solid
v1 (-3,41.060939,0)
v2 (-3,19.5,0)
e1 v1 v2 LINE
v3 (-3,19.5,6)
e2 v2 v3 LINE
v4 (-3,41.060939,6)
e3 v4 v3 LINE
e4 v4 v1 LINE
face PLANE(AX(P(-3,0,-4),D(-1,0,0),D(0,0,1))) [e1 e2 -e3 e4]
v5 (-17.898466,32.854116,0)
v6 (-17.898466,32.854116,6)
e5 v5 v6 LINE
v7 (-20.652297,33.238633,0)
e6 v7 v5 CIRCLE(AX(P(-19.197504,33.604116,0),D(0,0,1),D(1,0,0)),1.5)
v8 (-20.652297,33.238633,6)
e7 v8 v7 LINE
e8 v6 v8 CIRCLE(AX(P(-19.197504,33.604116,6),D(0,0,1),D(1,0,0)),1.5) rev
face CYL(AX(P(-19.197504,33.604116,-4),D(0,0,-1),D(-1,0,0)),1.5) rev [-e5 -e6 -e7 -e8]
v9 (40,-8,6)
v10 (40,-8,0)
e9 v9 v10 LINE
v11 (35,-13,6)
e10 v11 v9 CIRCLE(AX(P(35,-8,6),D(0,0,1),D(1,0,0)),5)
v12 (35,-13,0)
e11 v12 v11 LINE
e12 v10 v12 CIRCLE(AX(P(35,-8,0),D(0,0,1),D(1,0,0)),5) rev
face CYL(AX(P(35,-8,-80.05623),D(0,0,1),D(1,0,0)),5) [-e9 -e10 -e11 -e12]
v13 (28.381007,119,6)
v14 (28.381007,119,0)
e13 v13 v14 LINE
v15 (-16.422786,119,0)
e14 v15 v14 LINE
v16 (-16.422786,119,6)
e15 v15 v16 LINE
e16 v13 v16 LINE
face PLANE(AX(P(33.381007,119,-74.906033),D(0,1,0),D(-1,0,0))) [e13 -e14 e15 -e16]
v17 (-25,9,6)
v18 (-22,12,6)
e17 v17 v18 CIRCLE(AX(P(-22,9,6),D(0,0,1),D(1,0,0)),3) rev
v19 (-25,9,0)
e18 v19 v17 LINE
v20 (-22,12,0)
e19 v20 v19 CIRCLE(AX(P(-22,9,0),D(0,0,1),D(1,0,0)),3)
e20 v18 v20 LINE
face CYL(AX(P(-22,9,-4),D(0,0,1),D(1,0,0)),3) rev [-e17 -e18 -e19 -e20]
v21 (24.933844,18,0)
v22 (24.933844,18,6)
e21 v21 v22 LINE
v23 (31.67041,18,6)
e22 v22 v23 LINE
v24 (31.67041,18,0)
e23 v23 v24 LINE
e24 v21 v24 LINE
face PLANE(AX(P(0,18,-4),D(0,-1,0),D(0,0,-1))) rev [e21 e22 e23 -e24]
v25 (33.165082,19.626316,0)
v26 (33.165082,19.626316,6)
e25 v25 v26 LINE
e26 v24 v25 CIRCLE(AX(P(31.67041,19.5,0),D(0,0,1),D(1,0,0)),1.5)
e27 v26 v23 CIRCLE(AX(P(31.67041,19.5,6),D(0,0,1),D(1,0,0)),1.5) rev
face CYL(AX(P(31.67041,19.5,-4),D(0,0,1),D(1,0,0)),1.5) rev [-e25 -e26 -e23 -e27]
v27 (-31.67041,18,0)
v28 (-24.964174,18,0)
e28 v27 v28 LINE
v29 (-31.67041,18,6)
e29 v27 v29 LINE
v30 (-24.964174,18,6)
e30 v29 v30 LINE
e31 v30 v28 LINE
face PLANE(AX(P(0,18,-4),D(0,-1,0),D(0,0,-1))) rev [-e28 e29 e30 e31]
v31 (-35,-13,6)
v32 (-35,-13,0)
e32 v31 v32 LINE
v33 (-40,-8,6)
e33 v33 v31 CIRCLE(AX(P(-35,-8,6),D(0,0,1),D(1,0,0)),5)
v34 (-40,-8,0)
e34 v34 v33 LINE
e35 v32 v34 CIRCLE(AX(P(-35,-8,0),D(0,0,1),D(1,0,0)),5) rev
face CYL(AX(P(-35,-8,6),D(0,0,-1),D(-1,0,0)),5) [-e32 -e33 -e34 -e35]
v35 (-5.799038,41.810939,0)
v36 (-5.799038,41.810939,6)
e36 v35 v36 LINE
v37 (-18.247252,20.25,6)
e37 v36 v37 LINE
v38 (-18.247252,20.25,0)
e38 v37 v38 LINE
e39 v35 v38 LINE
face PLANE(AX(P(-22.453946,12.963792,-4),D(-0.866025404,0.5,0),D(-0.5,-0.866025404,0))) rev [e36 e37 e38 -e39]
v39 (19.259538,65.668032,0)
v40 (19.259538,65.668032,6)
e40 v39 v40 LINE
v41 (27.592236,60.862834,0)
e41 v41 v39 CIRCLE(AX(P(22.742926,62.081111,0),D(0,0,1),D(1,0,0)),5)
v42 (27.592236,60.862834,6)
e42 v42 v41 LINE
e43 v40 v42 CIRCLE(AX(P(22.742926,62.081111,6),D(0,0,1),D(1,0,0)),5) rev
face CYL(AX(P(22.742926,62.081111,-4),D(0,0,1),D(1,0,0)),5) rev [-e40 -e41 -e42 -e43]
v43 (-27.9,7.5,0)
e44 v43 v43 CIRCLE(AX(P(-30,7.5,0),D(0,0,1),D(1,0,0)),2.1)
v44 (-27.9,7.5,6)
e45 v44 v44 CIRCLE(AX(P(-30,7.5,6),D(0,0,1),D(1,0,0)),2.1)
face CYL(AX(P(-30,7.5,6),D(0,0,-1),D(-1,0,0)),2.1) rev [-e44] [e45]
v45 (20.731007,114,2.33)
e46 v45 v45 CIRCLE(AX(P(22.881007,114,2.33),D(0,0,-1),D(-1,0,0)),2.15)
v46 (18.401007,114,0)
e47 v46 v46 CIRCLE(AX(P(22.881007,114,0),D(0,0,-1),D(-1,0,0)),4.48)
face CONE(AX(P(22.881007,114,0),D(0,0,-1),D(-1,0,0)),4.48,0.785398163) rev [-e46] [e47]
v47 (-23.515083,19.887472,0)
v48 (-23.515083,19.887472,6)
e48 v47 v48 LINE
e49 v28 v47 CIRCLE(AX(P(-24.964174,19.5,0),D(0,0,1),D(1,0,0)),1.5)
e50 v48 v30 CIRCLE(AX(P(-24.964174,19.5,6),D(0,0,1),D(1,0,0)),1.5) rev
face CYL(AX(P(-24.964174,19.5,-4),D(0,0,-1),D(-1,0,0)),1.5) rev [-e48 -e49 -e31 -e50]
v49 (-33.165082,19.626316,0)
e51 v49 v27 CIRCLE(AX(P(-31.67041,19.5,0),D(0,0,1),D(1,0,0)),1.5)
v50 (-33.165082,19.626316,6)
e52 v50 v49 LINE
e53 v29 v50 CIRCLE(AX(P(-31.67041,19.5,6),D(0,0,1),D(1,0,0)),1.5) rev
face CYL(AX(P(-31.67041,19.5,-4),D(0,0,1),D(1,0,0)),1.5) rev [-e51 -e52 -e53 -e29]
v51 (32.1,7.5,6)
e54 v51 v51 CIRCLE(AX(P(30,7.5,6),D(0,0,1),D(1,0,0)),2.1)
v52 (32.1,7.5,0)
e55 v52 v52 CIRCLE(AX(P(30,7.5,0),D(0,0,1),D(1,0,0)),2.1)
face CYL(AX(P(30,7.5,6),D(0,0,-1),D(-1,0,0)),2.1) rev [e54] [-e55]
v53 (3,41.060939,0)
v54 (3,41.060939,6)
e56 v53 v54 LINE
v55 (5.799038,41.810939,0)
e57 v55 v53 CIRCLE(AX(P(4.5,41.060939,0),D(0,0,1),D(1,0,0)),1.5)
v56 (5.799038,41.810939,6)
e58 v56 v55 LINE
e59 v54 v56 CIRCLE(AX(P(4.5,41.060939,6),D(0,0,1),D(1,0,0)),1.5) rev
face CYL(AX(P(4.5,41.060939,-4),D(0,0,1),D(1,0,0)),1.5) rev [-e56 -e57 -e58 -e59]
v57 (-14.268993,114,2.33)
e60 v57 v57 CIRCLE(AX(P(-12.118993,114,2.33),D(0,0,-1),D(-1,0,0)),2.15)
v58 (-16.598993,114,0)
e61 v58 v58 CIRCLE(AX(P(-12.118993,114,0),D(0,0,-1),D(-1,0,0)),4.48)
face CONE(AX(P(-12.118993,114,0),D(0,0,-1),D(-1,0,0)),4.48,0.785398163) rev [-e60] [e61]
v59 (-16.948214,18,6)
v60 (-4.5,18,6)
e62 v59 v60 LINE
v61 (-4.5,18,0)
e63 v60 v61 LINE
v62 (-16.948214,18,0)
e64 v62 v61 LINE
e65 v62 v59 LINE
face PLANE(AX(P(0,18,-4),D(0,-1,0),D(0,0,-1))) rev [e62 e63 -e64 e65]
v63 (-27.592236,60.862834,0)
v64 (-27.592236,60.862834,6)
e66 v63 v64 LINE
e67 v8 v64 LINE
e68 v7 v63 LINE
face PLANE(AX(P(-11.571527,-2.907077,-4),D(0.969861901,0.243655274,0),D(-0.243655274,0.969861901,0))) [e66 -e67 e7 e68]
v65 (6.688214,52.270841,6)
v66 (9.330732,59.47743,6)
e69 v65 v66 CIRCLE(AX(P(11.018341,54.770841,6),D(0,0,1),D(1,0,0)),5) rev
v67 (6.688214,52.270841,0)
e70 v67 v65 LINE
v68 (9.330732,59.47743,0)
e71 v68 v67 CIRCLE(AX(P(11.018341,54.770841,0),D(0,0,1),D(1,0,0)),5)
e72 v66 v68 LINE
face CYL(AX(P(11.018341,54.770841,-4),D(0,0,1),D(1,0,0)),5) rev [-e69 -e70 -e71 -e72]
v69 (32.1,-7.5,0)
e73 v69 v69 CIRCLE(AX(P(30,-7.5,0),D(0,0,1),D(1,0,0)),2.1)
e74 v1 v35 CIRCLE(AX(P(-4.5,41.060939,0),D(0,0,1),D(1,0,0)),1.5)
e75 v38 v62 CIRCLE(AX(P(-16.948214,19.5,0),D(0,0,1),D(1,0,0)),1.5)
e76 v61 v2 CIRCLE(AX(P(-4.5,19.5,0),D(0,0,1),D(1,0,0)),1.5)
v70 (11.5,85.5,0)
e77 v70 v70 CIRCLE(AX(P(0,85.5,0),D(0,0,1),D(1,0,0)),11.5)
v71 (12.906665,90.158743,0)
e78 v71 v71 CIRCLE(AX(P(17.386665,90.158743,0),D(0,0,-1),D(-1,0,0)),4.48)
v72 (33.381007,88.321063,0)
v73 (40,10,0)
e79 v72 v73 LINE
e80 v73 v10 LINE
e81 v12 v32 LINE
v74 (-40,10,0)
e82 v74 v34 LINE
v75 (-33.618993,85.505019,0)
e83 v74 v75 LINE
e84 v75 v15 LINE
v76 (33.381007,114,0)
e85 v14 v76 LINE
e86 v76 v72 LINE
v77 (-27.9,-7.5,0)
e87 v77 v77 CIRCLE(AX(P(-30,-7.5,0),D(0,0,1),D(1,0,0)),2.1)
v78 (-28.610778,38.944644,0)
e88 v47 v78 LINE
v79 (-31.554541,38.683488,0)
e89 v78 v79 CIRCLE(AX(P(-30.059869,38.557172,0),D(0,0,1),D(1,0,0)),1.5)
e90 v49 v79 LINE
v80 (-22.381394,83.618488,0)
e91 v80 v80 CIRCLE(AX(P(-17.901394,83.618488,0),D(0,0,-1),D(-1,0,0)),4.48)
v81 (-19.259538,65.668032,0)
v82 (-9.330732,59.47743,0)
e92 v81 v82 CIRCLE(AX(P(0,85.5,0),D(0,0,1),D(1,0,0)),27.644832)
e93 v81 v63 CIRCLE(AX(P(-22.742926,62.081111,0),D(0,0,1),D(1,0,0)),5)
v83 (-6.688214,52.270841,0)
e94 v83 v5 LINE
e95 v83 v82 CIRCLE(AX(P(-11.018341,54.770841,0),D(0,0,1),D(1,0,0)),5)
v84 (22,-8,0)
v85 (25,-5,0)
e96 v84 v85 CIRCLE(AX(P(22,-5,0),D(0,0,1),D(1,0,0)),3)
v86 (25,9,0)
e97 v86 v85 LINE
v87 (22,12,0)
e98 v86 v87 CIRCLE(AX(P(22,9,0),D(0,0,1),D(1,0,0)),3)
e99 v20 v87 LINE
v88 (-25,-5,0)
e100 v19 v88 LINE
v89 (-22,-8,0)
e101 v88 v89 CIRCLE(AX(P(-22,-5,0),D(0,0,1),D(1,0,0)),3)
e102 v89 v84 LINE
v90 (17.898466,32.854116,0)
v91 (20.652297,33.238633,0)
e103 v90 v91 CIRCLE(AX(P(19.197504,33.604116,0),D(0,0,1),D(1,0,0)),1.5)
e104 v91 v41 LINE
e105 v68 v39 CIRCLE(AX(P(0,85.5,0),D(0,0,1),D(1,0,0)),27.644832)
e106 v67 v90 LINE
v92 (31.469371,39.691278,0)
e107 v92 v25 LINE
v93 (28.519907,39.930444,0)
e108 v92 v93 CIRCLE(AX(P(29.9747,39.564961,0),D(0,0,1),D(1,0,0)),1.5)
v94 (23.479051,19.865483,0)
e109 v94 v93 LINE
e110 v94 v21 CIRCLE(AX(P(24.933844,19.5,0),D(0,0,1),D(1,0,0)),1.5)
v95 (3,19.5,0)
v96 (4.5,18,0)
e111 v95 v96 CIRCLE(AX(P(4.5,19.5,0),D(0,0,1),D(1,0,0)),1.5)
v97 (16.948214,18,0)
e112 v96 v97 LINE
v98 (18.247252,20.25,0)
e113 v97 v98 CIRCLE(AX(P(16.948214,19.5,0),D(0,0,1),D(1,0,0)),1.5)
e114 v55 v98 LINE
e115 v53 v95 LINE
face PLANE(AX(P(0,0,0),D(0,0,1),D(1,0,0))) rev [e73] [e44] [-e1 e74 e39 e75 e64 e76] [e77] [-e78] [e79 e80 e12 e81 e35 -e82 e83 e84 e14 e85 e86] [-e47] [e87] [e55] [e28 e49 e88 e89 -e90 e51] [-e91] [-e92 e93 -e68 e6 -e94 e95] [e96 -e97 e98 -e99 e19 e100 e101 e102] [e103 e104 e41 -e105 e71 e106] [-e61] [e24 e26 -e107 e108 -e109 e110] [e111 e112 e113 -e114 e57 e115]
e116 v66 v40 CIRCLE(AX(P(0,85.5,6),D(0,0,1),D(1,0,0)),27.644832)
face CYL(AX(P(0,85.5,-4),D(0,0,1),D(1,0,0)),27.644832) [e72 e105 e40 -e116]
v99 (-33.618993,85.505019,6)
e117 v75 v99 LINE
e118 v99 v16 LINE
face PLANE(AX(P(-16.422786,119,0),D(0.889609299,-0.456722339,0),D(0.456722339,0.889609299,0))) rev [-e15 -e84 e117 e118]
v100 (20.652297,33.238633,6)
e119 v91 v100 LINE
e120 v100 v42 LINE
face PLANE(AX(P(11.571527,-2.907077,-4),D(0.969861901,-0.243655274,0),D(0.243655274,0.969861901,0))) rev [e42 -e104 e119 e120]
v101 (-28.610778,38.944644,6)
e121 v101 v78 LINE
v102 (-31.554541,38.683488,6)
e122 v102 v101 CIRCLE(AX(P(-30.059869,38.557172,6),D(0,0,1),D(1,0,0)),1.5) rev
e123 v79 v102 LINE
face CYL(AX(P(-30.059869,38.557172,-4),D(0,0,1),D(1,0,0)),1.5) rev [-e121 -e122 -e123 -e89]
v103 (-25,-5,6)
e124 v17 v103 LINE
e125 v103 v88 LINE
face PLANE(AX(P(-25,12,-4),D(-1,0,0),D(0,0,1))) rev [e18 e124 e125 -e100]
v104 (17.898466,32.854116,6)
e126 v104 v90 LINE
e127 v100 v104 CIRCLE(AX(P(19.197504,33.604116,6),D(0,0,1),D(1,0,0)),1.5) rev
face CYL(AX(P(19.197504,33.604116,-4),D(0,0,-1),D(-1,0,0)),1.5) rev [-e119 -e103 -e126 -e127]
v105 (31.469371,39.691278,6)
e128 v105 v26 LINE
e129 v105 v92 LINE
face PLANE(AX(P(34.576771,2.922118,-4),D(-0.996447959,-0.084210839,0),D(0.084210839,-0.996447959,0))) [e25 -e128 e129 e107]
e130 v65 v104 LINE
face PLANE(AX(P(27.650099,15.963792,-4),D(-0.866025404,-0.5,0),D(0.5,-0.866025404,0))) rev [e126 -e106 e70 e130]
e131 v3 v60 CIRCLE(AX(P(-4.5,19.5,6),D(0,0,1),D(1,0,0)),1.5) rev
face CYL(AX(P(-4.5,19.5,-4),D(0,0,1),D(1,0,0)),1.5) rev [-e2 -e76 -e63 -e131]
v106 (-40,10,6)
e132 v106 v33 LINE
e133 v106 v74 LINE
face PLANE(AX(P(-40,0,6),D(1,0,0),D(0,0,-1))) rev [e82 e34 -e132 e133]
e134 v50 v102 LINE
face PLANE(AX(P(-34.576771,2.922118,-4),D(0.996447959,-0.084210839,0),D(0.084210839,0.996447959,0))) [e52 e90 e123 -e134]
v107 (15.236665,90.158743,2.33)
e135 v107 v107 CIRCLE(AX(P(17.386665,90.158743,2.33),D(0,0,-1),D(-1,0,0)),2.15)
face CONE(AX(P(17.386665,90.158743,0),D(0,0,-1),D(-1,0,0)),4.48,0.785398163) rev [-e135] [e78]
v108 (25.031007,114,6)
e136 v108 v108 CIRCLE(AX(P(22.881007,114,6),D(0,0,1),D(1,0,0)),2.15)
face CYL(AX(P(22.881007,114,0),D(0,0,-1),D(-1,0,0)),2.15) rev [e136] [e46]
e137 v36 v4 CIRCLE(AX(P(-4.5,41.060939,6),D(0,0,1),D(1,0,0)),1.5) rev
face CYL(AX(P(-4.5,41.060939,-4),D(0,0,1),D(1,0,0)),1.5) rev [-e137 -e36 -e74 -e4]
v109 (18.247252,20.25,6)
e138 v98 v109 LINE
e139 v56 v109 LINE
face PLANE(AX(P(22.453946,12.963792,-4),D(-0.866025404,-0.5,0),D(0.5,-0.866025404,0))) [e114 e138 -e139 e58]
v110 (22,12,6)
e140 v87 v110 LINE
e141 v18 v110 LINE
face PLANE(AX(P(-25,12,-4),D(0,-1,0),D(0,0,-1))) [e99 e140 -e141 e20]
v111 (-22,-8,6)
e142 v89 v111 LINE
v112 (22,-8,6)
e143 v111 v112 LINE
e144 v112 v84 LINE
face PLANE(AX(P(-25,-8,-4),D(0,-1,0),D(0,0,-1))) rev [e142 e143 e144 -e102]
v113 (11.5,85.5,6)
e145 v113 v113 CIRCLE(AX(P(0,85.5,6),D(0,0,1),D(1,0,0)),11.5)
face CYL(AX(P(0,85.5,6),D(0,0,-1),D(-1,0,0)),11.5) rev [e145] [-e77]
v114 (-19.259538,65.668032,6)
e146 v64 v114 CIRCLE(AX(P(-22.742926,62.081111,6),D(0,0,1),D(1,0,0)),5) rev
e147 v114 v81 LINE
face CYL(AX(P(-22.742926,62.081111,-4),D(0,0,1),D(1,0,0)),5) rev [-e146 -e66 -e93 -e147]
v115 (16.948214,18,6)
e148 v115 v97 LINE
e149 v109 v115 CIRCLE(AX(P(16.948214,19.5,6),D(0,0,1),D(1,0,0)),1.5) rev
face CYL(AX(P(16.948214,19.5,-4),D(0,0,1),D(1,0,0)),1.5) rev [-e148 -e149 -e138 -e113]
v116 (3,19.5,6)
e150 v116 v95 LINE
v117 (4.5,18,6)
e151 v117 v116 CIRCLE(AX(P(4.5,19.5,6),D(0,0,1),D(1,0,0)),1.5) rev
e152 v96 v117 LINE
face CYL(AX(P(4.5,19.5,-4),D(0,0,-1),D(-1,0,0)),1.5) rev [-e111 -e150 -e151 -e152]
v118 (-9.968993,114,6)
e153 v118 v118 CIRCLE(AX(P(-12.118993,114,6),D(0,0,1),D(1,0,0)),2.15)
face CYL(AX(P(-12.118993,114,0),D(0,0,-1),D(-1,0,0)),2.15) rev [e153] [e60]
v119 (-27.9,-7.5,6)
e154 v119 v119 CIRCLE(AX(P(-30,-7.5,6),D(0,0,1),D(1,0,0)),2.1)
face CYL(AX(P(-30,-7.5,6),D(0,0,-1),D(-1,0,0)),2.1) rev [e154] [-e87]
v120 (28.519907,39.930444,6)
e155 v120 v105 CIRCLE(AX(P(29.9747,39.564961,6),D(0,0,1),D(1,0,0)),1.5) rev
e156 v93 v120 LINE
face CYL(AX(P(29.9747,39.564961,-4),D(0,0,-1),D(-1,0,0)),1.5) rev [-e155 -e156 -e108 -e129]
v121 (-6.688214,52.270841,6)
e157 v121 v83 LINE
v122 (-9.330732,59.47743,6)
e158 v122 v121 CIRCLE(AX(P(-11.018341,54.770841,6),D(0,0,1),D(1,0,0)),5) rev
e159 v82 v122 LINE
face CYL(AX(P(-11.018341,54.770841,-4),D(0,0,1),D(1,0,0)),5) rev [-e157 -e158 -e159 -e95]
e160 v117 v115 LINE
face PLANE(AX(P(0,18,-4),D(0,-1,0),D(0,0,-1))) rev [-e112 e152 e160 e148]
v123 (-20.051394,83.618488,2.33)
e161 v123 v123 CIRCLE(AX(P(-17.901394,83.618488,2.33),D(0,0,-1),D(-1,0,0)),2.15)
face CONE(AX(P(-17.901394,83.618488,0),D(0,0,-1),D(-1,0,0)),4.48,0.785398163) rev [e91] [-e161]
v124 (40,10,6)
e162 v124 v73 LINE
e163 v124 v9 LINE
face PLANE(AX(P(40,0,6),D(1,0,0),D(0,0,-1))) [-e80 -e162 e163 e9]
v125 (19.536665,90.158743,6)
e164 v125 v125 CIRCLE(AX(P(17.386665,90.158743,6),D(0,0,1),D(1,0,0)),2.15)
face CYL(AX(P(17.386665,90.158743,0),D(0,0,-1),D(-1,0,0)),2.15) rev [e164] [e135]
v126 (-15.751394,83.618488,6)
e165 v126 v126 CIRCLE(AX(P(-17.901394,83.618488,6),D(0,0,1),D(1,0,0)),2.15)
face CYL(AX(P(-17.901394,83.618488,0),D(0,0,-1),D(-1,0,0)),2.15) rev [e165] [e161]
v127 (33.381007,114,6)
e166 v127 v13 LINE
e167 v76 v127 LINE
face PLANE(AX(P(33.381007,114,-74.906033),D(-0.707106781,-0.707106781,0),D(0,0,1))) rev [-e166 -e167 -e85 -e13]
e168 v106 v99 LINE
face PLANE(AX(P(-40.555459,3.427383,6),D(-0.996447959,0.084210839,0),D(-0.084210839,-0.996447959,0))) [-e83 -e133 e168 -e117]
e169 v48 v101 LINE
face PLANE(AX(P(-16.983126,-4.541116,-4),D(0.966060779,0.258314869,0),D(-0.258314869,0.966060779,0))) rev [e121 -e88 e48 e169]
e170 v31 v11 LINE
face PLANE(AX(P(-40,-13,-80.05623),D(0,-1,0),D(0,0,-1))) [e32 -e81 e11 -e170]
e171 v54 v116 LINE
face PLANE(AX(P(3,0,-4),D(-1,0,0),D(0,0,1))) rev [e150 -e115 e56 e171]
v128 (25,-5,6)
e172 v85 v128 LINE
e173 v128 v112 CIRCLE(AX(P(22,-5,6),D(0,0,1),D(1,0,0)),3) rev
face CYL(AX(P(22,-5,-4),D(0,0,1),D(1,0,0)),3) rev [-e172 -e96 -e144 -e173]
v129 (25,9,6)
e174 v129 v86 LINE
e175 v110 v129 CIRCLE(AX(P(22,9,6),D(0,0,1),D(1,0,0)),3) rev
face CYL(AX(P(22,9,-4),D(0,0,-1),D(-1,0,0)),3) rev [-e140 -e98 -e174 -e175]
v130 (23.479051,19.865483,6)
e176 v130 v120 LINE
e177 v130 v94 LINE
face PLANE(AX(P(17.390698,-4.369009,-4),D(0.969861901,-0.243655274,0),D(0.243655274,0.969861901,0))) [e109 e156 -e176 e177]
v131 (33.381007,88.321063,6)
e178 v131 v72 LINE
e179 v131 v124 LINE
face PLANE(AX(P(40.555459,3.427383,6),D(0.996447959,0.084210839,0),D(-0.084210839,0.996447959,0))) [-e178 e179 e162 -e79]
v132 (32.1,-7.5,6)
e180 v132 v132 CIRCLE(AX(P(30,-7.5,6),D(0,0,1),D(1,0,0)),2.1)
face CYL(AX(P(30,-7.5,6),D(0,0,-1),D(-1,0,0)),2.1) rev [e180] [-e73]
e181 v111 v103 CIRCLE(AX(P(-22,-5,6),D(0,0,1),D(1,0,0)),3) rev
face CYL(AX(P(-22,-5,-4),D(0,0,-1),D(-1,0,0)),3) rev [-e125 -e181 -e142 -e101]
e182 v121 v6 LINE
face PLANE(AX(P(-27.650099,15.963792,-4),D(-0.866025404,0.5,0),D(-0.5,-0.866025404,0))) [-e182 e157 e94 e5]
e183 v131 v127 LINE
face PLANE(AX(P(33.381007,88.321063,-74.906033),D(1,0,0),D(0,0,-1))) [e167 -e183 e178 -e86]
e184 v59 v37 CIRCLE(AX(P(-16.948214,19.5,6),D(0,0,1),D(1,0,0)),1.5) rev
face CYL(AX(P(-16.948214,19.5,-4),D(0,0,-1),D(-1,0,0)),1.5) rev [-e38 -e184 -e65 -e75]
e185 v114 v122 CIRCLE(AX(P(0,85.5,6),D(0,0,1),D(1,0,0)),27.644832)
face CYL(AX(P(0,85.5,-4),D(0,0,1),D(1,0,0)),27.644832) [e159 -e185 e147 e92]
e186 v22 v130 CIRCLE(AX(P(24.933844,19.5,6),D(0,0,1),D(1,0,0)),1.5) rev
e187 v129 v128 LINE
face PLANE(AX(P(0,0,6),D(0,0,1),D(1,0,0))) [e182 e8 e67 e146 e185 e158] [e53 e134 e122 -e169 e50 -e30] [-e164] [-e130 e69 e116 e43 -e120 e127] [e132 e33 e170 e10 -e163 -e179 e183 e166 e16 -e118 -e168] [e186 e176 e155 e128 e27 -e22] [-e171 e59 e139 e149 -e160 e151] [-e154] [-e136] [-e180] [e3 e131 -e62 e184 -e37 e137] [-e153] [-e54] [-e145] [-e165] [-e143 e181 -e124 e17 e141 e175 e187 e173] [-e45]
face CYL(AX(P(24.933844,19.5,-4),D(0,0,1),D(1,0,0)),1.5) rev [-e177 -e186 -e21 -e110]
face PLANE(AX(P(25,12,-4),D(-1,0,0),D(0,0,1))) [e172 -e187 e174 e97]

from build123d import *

# Parameters (mm, degrees)
SKETCH_1_R                   = 33.5
SKETCH_1_R_2                 = 11.5
SKETCH_1_W                   = 80
SKETCH_1_H                   = 20
SKETCH_1_R_3                 = 2.1
EXTRUDE_1_DEPTH              = 6
SKETCH_3_W                   = 80
SKETCH_3_H                   = 3
EXTRUDE_2_DEPTH              = 6
FILLET_1_R                   = 5
EXTRUDE_START                = -6
EXTRUDE_3_DEPTH              = 6
SKETCH_5_R                   = 2
CUT_EXTRUDE_1_DEPTH          = 126.686116974
HOLE_WIZARD_M4_1_D           = 4.3
HOLE_WIZARD_M4_1_DEPTH       = 10
HOLE_WIZARD_M4_1_CSINK_D     = 8.96
HOLE_WIZARD_M4_1_CSINK_ANGLE = 90
HOLE_WIZARD_M4_1_TIP         = 1.291850331
SKETCH_8_R                   = 2.1
CUT_EXTRUDE_2_DEPTH          = 10
HOLE_WIZARD_M4_2_D           = 4.3
HOLE_WIZARD_M4_2_DEPTH       = 10
HOLE_WIZARD_M4_2_CSINK_D     = 8.96
HOLE_WIZARD_M4_2_CSINK_ANGLE = 90
HOLE_WIZARD_M4_2_TIP         = 1.291850331
CHAMFER_1_SIZE               = 5
CUT_EXTRUDE_3_DEPTH          = 126.686116974
SKETCH_13_W                  = 50
SKETCH_13_H                  = 20
CUT_EXTRUDE_5_DEPTH          = 10
FILLET_3_R                   = 3
FILLET_4_R                   = 6
FILLET_5_R                   = 5
FILLET_6_R                   = 1.5
FILLET_7_R                   = 5


with BuildPart() as part:
    # 草图1 → 凸台-拉伸1 (new body)
    # profile 1 of 3: a face of its own
    with BuildSketch(Plane.XY):
        with Locations((0, 85.5)):
            Circle(SKETCH_1_R)
        with Locations((0, 85.5)):
            Circle(SKETCH_1_R_2, mode=Mode.SUBTRACT)
    # profile 2 of 3: a face of its own
    with BuildSketch(Plane.XY):
        with BuildLine():
            Line((-33.38100662, 88.32106311), (-40, 10))
            Line((-40, 10), (40, 10))
            Line((40, 10), (33.38100662, 88.32106311))
            ThreePointArc((33.38100662, 88.32106311), (33.470238435, 86.911785792), (33.5, 85.5))
            ThreePointArc((33.5, 85.5), (-1.411785792, 52.029761565), (-33.38100662, 88.32106311))
        make_face()
    # profile 3 of 3: a face of its own
    with BuildSketch(Plane.XY):
        Rectangle(SKETCH_1_W, SKETCH_1_H)
        with Locations((-30, 7.5)):
            Circle(SKETCH_1_R_3, mode=Mode.SUBTRACT)
        with Locations((30, 7.5)):
            Circle(SKETCH_1_R_3, mode=Mode.SUBTRACT)
        with Locations((30, -7.5)):
            Circle(SKETCH_1_R_3, mode=Mode.SUBTRACT)
        with Locations((-30, -7.5)):
            Circle(SKETCH_1_R_3, mode=Mode.SUBTRACT)
    extrude(amount=EXTRUDE_1_DEPTH)

    # 草图3 → 凸台-拉伸2 (add)
    with BuildSketch(Plane.XY.offset(6)):
        with Locations((0, -11.5)):
            Rectangle(SKETCH_3_W, SKETCH_3_H)
    extrude(amount=-EXTRUDE_2_DEPTH)

    # 圆角1
    fillet_1_edges = [part.edges().sort_by_distance(p)[0] for p in [
        (-40, -13, 3),
        (40, -13, 3),
    ]]
    fillet(fillet_1_edges, radius=FILLET_1_R)

    # 草图4 → 凸台-拉伸3 (add)
    with BuildSketch(Plane.XY.offset(6).offset(EXTRUDE_START)):
        with BuildLine():
            Line((33.38100662, 88.32106311), (11.148614395, 88.32106311))
            ThreePointArc((11.148614395, 88.32106311), (-1.418941021, 96.91212541), (-11.499998905, 85.50501918))
            Line((-11.499998905, 85.50501918), (-33.61899338, 85.50501918))
            Line((-33.61899338, 85.50501918), (-33.61899338, 119))
            Line((-33.61899338, 119), (33.38100662, 119))
            Line((33.38100662, 119), (33.38100662, 88.32106311))
        make_face()
    extrude(amount=EXTRUDE_3_DEPTH)

    # 草图5 → 切除-拉伸1 (cut, through all)
    with BuildSketch(Plane.XY.offset(6)):
        with Locations((-17.901394117, 83.618487661)):
            Circle(SKETCH_5_R)
        with Locations((17.386664873, 90.158742812)):
            Circle(SKETCH_5_R)
    extrude(amount=-CUT_EXTRUDE_1_DEPTH, mode=Mode.SUBTRACT)

    # M4 六角凹锥坑螺钉的锥形沉头孔1
    with Locations(Plane(origin=(0, 0, 0), x_dir=(-1, 0, 0), z_dir=(0, 0, -1))):
        with Locations((-17.386664873, 90.158742812), (17.901394117, 83.618487661)):
            CounterSinkHole(HOLE_WIZARD_M4_1_D / 2, HOLE_WIZARD_M4_1_CSINK_D / 2, depth=HOLE_WIZARD_M4_1_DEPTH, counter_sink_angle=HOLE_WIZARD_M4_1_CSINK_ANGLE)
            with Locations((0, 0, -(HOLE_WIZARD_M4_1_DEPTH + HOLE_WIZARD_M4_1_TIP / 2))):  # 118° drill point
                Cone(0, HOLE_WIZARD_M4_1_D / 2, HOLE_WIZARD_M4_1_TIP, mode=Mode.SUBTRACT)

    # 草图8 → 切除-拉伸2 (cut)
    with BuildSketch(Plane.XY.offset(6)):
        with Locations((-12.118993381, 114)):
            Circle(SKETCH_8_R)
        with Locations((22.881006619, 114)):
            Circle(SKETCH_8_R)
    extrude(amount=-CUT_EXTRUDE_2_DEPTH, mode=Mode.SUBTRACT)

    # M4 六角凹锥坑螺钉的锥形沉头孔2
    with Locations(Plane(origin=(0, 0, 0), x_dir=(-1, 0, 0), z_dir=(0, 0, -1))):
        with Locations((-22.881006619, 114), (12.118993381, 114)):
            CounterSinkHole(HOLE_WIZARD_M4_2_D / 2, HOLE_WIZARD_M4_2_CSINK_D / 2, depth=HOLE_WIZARD_M4_2_DEPTH, counter_sink_angle=HOLE_WIZARD_M4_2_CSINK_ANGLE)
            with Locations((0, 0, -(HOLE_WIZARD_M4_2_DEPTH + HOLE_WIZARD_M4_2_TIP / 2))):  # 118° drill point
                Cone(0, HOLE_WIZARD_M4_2_D / 2, HOLE_WIZARD_M4_2_TIP, mode=Mode.SUBTRACT)

    # 倒角1
    chamfer_1_edges = [part.edges().sort_by_distance(p)[0] for p in [
        (33.38100662, 119, 3),
    ]]
    chamfer(chamfer_1_edges, length=CHAMFER_1_SIZE)

    # 草图11 → 切除-拉伸3 (cut, through all)
    with BuildSketch(Plane.XY.offset(6)):
        Polygon((-33.61899338, 119), (-16.422785999, 119), (-33.61899338, 85.50501918), align=None)
    extrude(amount=-CUT_EXTRUDE_3_DEPTH, mode=Mode.SUBTRACT)

    # 草图13 → 切除-拉伸5 (cut)
    with BuildSketch(Plane.XY.offset(6)):
        with BuildLine():
            Line((-29.15457937, 67.081692819), (-19.750016495, 29.647135893))
            Line((-19.750016495, 29.647135893), (-3.346711376, 58.058493772))
            ThreePointArc((-3.346711376, 58.058493772), (-20.530627933, 66.987030012), (-27.640305628, 84.999754146))
            Line((-27.640305628, 84.999754146), (-29.15457937, 67.081692819))
        make_face()
        Polygon((-24.106901542, 22.100789629), (-30.830808938, 47.247244556), (-33.302523575, 18), (-23.010391923, 18), align=None)
        Polygon((-3, 46.65901549), (-17.649366774, 21.285567939), (-19.546290308, 18), (-3, 18), align=None)
        with BuildLine():
            Line((29.15457937, 67.081692819), (27.640305628, 84.999754146))
            ThreePointArc((27.640305628, 84.999754146), (20.530627933, 66.987030012), (3.346711376, 58.058493772))
            Line((3.346711376, 58.058493772), (19.750016495, 29.647135893))
            Line((19.750016495, 29.647135893), (29.15457937, 67.081692819))
        make_face()
        Polygon((17.649366774, 21.285567939), (3, 46.65901549), (3, 18), (19.546290308, 18), align=None)
        Polygon((33.302523575, 18), (30.711815557, 48.65526652), (24.060716784, 22.180783977), (23.010391923, 18), align=None)
        with Locations((0, 2)):
            Rectangle(SKETCH_13_W, SKETCH_13_H)
    extrude(amount=-CUT_EXTRUDE_5_DEPTH, mode=Mode.SUBTRACT)

    # 圆角3
    fillet_3_edges = [part.edges().sort_by_distance(p)[0] for p in [
        (25, -8, 3),
        (-25, -8, 3),
        (-25, 12, 3),
        (25, 12, 3),
    ]]
    fillet(fillet_3_edges, radius=FILLET_3_R)

    # 圆角4
    # the kernel refuses this fillet: 6 mm, written as the material it adds along each edge
    with BuildSketch(Plane(origin=(27.640305628, 84.999754146, 6), x_dir=(0.08421083909463391, -0.996447958791114, 0), z_dir=(0, 0, -1))) as fillet_4_piece_1:
        with BuildLine():
            CenterArc((21.827755911, 4.605393907), FILLET_4_R, 137.118904636, 93.016882278)
            Line((17.431151142, 8.688268692), (17.343219046, 8.769926188))
            ThreePointArc((17.343219046, 8.769926188), (9.452514246, 2.865624658), (-0.012267388, 0.119371316))
            Line((-0.012267388, 0.119371316), (0, -0.12))
            ThreePointArc((0, -0.12), (8.990966949, -0.12), (17.905017457, -0.092107878))
            Line((17.905017457, -0.092107878), (17.981933897, 0))
        make_face()
    extrude(amount=6)
    with BuildSketch(Plane(origin=(-27.640305628, 84.999754146, 6), x_dir=(-0.08421083909464076, -0.9964479587911135, 0), z_dir=(0, 0, -1))) as fillet_4_piece_2:
        with BuildLine():
            CenterArc((21.827755911, -4.605393907), FILLET_4_R, 129.864213086, 93.016882278)
            Line((17.431151142, -8.688268692), (17.343219046, -8.769926188))
            ThreePointArc((17.343219046, -8.769926188), (9.452514246, -2.865624658), (-0.012267388, -0.119371316))
            Line((-0.012267388, -0.119371316), (0, 0.12))
            ThreePointArc((0, 0.12), (8.990966949, 0.12), (17.905017457, 0.092107878))
            Line((17.905017457, 0.092107878), (17.981933897, 0))
        make_face()
    extrude(amount=6)

    # 圆角5
    fillet_5_edges = [part.edges().sort_by_distance(p)[0] for p in [
        (3.346711376, 58.058493772, 3),
        (-3.346711376, 58.058493772, 3),
    ]]
    fillet(fillet_5_edges, radius=FILLET_5_R)

    # 圆角6
    fillet_6_edges = [part.edges().sort_by_distance(p)[0] for p in [
        (19.546290308, 18, 3),
        (3, 18, 3),
        (3, 46.65901549, 3),
        (19.750016495, 29.647135893, 3),
        (-19.546290308, 18, 3),
        (-3, 46.65901549, 3),
        (-3, 18, 3),
        (-23.010391923, 18, 3),
        (-33.302523575, 18, 3),
        (-30.830808938, 47.247244556, 3),
        (23.010391923, 18, 3),
        (30.711815557, 48.65526652, 3),
        (33.302523575, 18, 3),
        (-19.750016495, 29.647135893, 3),
    ]]
    fillet(fillet_6_edges, radius=FILLET_6_R)

    # 圆角7
    # the kernel refuses this fillet: 5 mm, written as the material it adds along each edge
    with BuildSketch(Plane(origin=(29.15457937, 67.081692819, 6), x_dir=(-0.2436552741241345, -0.9698619011959861, 0), z_dir=(0, 0, -1))) as fillet_7_piece_1:
        with BuildLine():
            CenterArc((6.41210713, 5), FILLET_7_R, 121.736562988, 148.263437012)
            Line((3.782034708, 9.252378047), (3.519027465, 9.677615851))
            ThreePointArc((3.519027465, 9.677615851), (2.06186763, 8.837638689), (-0.427669644, -0.25903412))
            Line((-0.427669644, -0.25903412), (0, -0.5))
            Line((0, -0.5), (6.41210713, -0.5))
            Line((6.41210713, -0.5), (6.41210713, 0))
        make_face()
    extrude(amount=6)
    with BuildSketch(Plane(origin=(-29.15457937, 67.081692819, 6), x_dir=(0.24365527412411786, -0.9698619011959904, 0), z_dir=(0, 0, -1))) as fillet_7_piece_2:
        with BuildLine():
            CenterArc((6.41210713, -5), FILLET_7_R, 90, 148.263437012)
            Line((3.782034708, -9.252378047), (3.519027465, -9.677615851))
            ThreePointArc((3.519027465, -9.677615851), (2.06186763, -8.837638689), (-0.427669644, 0.25903412))
            Line((-0.427669644, 0.25903412), (0, 0.5))
            Line((0, 0.5), (6.41210713, 0.5))
            Line((6.41210713, 0.5), (6.41210713, 0))
        make_face()
    extrude(amount=6)


solid = part.part
